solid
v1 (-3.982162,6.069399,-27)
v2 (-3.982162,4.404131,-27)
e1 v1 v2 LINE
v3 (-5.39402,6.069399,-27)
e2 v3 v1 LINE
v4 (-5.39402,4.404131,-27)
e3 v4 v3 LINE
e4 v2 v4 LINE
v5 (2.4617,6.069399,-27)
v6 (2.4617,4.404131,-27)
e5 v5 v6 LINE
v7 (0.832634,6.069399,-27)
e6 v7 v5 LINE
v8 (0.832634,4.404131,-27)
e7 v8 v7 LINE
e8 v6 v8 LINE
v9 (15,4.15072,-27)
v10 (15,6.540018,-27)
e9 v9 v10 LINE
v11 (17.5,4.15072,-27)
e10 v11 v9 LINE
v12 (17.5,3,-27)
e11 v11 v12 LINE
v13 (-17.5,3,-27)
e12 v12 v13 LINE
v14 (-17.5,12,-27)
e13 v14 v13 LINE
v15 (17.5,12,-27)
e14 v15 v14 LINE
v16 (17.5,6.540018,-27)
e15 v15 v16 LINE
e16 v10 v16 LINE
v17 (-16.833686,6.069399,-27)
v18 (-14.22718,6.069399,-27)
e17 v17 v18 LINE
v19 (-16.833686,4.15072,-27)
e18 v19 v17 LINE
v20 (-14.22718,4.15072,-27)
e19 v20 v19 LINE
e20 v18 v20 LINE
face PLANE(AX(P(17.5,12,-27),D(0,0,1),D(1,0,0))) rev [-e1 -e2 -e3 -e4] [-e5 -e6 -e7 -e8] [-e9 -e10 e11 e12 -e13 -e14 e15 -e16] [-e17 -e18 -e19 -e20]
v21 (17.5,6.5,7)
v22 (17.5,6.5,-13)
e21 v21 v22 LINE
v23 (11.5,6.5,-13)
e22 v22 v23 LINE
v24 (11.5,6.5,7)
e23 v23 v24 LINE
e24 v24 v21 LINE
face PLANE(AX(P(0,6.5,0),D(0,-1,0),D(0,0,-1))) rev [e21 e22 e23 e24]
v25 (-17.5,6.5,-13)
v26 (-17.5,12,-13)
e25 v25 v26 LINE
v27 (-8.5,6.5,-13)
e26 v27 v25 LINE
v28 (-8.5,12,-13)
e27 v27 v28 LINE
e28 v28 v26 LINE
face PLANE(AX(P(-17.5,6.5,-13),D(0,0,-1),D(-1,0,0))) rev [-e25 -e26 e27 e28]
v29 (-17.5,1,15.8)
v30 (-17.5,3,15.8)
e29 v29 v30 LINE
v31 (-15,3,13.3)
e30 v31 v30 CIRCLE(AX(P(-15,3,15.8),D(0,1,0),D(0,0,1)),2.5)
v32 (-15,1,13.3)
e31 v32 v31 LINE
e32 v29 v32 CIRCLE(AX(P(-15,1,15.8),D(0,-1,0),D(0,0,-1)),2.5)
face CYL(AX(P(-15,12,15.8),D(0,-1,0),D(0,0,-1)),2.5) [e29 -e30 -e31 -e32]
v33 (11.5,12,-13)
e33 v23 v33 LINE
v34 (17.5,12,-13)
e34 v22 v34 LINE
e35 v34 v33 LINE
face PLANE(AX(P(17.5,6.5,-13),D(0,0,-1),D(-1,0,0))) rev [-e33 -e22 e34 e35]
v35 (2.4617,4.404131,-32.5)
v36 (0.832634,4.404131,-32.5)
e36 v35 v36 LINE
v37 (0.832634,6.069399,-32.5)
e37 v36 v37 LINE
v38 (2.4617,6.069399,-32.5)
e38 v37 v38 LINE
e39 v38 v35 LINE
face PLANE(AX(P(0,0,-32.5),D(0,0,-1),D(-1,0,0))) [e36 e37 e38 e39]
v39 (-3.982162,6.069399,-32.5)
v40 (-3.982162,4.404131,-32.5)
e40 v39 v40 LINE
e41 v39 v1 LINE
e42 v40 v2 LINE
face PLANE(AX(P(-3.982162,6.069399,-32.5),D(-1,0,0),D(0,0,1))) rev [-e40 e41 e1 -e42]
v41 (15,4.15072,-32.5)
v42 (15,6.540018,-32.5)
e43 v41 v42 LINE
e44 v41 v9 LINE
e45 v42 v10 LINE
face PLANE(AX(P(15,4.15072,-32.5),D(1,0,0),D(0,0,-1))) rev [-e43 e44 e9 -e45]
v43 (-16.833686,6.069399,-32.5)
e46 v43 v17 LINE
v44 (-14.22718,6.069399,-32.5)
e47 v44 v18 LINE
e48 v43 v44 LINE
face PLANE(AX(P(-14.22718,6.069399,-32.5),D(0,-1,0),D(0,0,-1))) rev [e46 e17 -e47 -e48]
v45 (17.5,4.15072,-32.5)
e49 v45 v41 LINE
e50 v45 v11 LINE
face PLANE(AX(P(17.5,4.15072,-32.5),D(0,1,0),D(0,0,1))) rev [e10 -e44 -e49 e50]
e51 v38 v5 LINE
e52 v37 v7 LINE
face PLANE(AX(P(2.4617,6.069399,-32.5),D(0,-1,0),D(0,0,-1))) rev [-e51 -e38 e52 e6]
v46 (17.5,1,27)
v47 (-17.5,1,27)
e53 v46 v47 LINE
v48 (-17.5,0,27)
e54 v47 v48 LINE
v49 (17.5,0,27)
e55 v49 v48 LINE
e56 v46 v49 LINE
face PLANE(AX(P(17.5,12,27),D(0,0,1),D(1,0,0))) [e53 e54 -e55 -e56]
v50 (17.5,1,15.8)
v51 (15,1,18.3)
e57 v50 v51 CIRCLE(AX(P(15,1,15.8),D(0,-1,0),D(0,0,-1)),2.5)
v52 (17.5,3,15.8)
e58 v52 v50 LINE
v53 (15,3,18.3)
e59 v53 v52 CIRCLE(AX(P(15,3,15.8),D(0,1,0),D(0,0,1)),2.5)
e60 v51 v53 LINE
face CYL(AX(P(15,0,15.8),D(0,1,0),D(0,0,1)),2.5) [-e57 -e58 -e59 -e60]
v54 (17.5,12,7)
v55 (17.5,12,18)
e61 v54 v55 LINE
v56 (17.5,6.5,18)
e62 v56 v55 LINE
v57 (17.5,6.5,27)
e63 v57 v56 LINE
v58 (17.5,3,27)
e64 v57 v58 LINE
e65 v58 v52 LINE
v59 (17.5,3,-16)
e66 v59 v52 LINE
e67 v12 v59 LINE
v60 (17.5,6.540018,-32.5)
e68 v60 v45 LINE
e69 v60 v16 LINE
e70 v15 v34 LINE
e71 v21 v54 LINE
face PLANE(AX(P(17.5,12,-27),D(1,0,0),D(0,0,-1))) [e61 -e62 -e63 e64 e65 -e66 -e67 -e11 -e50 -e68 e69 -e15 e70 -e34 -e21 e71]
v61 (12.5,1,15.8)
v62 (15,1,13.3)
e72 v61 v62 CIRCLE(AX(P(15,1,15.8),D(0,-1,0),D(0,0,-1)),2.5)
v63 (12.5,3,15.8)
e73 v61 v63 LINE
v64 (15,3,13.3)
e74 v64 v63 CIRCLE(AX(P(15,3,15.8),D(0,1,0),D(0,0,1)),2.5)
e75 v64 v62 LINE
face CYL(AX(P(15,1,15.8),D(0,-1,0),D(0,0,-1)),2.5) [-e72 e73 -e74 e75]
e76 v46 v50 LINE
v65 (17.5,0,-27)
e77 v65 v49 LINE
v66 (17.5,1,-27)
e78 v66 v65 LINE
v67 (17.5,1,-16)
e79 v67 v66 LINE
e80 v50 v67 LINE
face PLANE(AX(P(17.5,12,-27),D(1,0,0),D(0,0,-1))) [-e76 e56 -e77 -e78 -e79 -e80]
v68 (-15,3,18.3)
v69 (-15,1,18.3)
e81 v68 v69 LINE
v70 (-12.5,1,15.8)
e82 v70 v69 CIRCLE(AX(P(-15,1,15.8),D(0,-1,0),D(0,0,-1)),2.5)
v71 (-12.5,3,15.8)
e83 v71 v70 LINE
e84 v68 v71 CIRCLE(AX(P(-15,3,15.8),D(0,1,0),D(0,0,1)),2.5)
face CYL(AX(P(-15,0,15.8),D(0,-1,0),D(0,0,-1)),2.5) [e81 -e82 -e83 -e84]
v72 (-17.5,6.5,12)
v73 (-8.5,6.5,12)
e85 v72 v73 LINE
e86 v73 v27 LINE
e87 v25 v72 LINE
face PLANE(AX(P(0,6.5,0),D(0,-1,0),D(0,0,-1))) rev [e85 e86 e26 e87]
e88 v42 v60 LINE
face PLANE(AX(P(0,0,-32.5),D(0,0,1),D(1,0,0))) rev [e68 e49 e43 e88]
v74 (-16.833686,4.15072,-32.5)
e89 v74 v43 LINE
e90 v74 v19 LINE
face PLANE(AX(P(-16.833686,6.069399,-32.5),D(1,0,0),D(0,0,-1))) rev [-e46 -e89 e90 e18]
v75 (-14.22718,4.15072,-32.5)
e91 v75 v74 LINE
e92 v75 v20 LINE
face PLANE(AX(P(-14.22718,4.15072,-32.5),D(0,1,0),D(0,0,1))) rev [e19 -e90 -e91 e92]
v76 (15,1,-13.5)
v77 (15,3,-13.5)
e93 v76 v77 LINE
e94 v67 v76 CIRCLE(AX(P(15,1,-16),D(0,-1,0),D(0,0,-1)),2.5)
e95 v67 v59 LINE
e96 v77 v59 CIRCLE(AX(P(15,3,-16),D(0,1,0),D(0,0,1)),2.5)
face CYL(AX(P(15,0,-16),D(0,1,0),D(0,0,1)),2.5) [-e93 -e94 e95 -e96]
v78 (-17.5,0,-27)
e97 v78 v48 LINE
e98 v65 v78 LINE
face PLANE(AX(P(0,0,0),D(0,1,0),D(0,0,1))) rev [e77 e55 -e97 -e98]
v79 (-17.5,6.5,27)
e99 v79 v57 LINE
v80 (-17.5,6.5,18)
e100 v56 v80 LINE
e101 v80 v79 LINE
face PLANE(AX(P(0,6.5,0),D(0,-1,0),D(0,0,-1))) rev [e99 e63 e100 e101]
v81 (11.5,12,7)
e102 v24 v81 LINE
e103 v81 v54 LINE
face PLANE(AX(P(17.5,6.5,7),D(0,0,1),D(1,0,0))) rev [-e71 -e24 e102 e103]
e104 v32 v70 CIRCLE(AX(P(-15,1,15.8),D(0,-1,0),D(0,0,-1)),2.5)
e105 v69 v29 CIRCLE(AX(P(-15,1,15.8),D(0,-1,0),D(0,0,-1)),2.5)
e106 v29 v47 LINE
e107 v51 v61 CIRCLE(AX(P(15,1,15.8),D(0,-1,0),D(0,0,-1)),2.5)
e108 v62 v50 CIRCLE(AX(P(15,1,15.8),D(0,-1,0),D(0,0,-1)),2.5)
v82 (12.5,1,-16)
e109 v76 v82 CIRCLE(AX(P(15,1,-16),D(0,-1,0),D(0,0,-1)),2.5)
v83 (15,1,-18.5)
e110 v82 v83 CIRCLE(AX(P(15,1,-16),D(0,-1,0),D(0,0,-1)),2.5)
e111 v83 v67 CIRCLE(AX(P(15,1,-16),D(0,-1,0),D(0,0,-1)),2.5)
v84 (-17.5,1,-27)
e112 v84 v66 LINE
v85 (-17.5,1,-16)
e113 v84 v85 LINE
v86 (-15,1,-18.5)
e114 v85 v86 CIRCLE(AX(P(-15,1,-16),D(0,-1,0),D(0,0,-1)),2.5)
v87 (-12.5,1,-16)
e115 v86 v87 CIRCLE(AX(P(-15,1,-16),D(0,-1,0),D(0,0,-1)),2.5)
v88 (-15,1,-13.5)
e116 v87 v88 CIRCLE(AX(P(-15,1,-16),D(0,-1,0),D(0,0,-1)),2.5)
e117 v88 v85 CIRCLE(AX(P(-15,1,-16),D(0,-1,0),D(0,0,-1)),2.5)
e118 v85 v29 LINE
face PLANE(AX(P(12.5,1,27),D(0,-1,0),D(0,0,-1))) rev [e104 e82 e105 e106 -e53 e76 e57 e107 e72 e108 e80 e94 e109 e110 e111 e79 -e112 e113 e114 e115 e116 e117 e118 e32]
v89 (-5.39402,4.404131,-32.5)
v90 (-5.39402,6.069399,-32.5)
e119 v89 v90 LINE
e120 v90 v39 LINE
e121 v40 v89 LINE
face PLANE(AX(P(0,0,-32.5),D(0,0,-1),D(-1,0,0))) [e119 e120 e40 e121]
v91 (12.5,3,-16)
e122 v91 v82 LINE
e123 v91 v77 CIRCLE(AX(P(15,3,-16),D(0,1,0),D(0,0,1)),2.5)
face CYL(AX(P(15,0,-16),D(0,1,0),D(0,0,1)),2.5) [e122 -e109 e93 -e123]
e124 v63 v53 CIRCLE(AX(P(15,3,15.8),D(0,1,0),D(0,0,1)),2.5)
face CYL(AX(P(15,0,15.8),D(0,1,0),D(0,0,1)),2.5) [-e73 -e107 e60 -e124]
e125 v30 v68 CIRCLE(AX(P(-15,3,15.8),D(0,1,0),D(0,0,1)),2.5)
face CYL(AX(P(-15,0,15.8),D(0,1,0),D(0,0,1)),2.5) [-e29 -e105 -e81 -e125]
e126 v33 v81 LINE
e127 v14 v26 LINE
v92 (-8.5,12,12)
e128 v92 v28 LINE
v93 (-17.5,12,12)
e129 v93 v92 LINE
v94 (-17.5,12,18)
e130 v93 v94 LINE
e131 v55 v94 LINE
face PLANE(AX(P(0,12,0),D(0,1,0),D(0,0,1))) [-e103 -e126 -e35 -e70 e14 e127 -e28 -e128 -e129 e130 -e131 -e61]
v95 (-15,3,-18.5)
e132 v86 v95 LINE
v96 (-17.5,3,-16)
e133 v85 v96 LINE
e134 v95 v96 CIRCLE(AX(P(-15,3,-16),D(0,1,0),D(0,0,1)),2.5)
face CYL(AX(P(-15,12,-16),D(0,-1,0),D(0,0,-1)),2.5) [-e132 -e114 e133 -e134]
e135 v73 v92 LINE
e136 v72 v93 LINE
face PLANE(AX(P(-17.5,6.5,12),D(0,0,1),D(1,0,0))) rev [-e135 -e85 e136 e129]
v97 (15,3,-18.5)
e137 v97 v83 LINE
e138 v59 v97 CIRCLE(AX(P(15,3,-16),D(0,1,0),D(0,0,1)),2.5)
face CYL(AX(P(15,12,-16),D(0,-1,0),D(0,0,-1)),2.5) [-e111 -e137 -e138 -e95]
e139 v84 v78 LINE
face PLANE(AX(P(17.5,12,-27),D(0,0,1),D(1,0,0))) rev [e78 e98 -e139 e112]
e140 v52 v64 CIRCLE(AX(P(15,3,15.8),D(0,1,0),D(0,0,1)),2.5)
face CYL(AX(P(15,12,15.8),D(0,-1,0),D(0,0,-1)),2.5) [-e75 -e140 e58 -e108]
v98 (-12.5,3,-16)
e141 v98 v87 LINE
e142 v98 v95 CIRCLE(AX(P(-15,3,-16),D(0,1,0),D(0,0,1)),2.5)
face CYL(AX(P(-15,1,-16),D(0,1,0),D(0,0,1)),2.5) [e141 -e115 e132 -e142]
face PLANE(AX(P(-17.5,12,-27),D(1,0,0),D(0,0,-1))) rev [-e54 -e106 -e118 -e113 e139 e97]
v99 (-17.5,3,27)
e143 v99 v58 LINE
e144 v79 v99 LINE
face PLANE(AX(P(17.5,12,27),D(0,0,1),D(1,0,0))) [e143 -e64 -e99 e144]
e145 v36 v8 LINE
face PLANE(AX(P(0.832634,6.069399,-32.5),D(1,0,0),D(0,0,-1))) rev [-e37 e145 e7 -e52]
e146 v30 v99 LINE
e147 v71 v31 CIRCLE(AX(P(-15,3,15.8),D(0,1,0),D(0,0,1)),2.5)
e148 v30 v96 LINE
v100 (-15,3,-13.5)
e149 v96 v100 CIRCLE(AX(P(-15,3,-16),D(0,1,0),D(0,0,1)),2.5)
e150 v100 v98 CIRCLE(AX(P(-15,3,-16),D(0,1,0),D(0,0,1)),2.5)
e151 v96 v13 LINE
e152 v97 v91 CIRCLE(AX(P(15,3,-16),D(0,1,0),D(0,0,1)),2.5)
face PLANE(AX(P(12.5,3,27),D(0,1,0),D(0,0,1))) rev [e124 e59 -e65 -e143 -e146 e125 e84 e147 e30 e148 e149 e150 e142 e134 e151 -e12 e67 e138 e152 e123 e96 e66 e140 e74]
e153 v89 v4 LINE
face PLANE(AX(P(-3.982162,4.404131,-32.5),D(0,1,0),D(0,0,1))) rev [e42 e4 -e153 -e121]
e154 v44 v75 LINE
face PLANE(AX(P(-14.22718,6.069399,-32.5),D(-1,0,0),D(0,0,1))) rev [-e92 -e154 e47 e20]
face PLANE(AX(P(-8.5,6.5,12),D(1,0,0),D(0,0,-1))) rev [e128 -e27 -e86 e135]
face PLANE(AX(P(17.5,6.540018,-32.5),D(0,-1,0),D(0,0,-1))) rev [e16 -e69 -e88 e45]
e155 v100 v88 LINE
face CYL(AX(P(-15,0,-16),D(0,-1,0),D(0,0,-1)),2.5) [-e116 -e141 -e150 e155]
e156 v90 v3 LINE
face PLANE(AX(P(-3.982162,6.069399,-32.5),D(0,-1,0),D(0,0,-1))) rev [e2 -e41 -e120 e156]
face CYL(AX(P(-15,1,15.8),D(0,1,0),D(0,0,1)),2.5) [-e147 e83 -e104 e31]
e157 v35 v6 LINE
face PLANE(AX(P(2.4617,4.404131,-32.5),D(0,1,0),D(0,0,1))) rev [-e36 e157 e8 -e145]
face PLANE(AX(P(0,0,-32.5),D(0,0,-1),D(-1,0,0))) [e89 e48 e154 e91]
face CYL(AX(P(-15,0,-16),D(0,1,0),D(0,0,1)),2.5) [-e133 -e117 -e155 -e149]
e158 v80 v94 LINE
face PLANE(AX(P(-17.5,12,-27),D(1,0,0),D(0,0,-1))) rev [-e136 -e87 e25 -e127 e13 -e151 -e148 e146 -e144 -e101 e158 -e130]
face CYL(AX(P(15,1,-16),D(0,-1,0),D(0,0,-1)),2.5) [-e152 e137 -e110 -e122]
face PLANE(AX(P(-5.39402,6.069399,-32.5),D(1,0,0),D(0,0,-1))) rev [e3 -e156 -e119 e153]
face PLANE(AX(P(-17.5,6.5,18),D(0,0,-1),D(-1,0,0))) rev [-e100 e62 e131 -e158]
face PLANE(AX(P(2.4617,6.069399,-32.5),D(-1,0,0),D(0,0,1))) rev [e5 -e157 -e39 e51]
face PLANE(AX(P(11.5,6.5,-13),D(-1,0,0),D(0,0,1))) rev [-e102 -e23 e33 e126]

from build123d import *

# Parameters (mm, degrees)
SKETCH1_W               = 35
SKETCH1_H               = 54
BOSS_EXTRUDE1_DEPTH     = 12
SKETCH2_W               = 35
SKETCH2_H               = 9
SKETCH2_W_2             = 9
SKETCH2_H_2             = 25
SKETCH2_W_3             = 6
SKETCH2_H_3             = 20
CUT_EXTRUDE1_DEPTH      = 5.5
CUT_EXTRUDE2_DEPTH      = 59.019393309
CUT_EXTRUDE2_DEPTH_BACK = 59.019393309
SKETCH3_W               = 25
SKETCH3_H               = 2
CUT_EXTRUDE3_DEPTH      = 46.803929962
CUT_EXTRUDE3_DEPTH_BACK = 46.803929962
SKETCH4_W               = 8.5
SKETCH4_H               = 2
SKETCH4_W_2             = 26.8
SKETCH4_W_3             = 8.7
FILLET1_R               = 2.5
SKETCH5_W               = 2.5
SKETCH5_H               = 2.389297353
SKETCH5_W_2             = 1.629066377
SKETCH5_H_2             = 1.665267852
SKETCH5_W_3             = 1.411857527
SKETCH5_W_4             = 2.606506203
SKETCH5_H_3             = 1.918678177
BOSS_EXTRUDE2_DEPTH     = 5.5


with BuildPart() as part:
    # Sketch1 → Boss-Extrude1 (new body)
    with BuildSketch(Plane(origin=(0, 0, 0), x_dir=(1, 0, 0), z_dir=(0, 1, 0))):
        Rectangle(SKETCH1_W, SKETCH1_H)
    extrude(amount=BOSS_EXTRUDE1_DEPTH)

    # Sketch2 → Cut-Extrude1 (cut)
    with BuildSketch(Plane(origin=(0, 12, 0), x_dir=(1, 0, 0), z_dir=(0, 1, 0))):
        with Locations((0, -22.5)):
            Rectangle(SKETCH2_W, SKETCH2_H)
        with Locations((-13, 0.5)):
            Rectangle(SKETCH2_W_2, SKETCH2_H_2)
        with Locations((14.5, 3)):
            Rectangle(SKETCH2_W_3, SKETCH2_H_3)
    extrude(amount=-CUT_EXTRUDE1_DEPTH, mode=Mode.SUBTRACT)

    # Sketch3 → Cut-Extrude2 (cut, two sides: drawn at the far end of the back side and taken through both)
    with BuildSketch(Plane(origin=(0, 0, -27), x_dir=(-1, 0, 0), z_dir=(0, 0, -1)).offset(-CUT_EXTRUDE2_DEPTH_BACK)):
        with Locations((0, 2)):
            Rectangle(SKETCH3_W, SKETCH3_H)
    extrude(amount=CUT_EXTRUDE2_DEPTH + CUT_EXTRUDE2_DEPTH_BACK, mode=Mode.SUBTRACT)

    # Sketch4 → Cut-Extrude3 (cut, two sides: drawn at the far end of the back side and taken through both)
    with BuildSketch(Plane.ZY.offset(17.5).offset(-CUT_EXTRUDE3_DEPTH_BACK)):
        with Locations((-22.75, 2)):
            Rectangle(SKETCH4_W, SKETCH4_H)
        with Locations((-0.1, 2)):
            Rectangle(SKETCH4_W_2, SKETCH4_H)
        with Locations((22.65, 2)):
            Rectangle(SKETCH4_W_3, SKETCH4_H)
    extrude(amount=CUT_EXTRUDE3_DEPTH + CUT_EXTRUDE3_DEPTH_BACK, mode=Mode.SUBTRACT)

    # Fillet1
    fillet1_edges = [part.edges().sort_by_distance(p)[0] for p in [
        (12.5, 2, -13.5),
        (12.5, 2, -18.5),
        (17.5, 2, -18.5),
        (17.5, 2, -13.5),
        (12.5, 2, 13.3),
        (12.5, 2, 18.3),
        (17.5, 2, 13.3),
        (17.5, 2, 18.3),
        (-12.5, 2, 13.3),
        (-12.5, 2, 18.3),
        (-12.5, 2, -18.5),
        (-12.5, 2, -13.5),
        (-17.5, 2, 13.3),
        (-17.5, 2, 18.3),
        (-17.5, 2, -18.5),
        (-17.5, 2, -13.5),
    ]]
    fillet(fillet1_edges, radius=FILLET1_R - 0.0001)  # a hair under: the kernel refuses the full size

    # Sketch5 → Boss-Extrude2 (add)
    with BuildSketch(Plane(origin=(0, 0, -27), x_dir=(-1, 0, 0), z_dir=(0, 0, -1))):
        with Locations((-16.25, 5.345369084)):
            Rectangle(SKETCH5_W, SKETCH5_H)
        with Locations((-1.647167115, 5.236764658)):
            Rectangle(SKETCH5_W_2, SKETCH5_H_2)
        with Locations((4.688091019, 5.236764658)):
            Rectangle(SKETCH5_W_3, SKETCH5_H_2)
        with Locations((15.530432797, 5.110059495)):
            Rectangle(SKETCH5_W_4, SKETCH5_H_3)
    extrude(amount=BOSS_EXTRUDE2_DEPTH)


solid = part.part
